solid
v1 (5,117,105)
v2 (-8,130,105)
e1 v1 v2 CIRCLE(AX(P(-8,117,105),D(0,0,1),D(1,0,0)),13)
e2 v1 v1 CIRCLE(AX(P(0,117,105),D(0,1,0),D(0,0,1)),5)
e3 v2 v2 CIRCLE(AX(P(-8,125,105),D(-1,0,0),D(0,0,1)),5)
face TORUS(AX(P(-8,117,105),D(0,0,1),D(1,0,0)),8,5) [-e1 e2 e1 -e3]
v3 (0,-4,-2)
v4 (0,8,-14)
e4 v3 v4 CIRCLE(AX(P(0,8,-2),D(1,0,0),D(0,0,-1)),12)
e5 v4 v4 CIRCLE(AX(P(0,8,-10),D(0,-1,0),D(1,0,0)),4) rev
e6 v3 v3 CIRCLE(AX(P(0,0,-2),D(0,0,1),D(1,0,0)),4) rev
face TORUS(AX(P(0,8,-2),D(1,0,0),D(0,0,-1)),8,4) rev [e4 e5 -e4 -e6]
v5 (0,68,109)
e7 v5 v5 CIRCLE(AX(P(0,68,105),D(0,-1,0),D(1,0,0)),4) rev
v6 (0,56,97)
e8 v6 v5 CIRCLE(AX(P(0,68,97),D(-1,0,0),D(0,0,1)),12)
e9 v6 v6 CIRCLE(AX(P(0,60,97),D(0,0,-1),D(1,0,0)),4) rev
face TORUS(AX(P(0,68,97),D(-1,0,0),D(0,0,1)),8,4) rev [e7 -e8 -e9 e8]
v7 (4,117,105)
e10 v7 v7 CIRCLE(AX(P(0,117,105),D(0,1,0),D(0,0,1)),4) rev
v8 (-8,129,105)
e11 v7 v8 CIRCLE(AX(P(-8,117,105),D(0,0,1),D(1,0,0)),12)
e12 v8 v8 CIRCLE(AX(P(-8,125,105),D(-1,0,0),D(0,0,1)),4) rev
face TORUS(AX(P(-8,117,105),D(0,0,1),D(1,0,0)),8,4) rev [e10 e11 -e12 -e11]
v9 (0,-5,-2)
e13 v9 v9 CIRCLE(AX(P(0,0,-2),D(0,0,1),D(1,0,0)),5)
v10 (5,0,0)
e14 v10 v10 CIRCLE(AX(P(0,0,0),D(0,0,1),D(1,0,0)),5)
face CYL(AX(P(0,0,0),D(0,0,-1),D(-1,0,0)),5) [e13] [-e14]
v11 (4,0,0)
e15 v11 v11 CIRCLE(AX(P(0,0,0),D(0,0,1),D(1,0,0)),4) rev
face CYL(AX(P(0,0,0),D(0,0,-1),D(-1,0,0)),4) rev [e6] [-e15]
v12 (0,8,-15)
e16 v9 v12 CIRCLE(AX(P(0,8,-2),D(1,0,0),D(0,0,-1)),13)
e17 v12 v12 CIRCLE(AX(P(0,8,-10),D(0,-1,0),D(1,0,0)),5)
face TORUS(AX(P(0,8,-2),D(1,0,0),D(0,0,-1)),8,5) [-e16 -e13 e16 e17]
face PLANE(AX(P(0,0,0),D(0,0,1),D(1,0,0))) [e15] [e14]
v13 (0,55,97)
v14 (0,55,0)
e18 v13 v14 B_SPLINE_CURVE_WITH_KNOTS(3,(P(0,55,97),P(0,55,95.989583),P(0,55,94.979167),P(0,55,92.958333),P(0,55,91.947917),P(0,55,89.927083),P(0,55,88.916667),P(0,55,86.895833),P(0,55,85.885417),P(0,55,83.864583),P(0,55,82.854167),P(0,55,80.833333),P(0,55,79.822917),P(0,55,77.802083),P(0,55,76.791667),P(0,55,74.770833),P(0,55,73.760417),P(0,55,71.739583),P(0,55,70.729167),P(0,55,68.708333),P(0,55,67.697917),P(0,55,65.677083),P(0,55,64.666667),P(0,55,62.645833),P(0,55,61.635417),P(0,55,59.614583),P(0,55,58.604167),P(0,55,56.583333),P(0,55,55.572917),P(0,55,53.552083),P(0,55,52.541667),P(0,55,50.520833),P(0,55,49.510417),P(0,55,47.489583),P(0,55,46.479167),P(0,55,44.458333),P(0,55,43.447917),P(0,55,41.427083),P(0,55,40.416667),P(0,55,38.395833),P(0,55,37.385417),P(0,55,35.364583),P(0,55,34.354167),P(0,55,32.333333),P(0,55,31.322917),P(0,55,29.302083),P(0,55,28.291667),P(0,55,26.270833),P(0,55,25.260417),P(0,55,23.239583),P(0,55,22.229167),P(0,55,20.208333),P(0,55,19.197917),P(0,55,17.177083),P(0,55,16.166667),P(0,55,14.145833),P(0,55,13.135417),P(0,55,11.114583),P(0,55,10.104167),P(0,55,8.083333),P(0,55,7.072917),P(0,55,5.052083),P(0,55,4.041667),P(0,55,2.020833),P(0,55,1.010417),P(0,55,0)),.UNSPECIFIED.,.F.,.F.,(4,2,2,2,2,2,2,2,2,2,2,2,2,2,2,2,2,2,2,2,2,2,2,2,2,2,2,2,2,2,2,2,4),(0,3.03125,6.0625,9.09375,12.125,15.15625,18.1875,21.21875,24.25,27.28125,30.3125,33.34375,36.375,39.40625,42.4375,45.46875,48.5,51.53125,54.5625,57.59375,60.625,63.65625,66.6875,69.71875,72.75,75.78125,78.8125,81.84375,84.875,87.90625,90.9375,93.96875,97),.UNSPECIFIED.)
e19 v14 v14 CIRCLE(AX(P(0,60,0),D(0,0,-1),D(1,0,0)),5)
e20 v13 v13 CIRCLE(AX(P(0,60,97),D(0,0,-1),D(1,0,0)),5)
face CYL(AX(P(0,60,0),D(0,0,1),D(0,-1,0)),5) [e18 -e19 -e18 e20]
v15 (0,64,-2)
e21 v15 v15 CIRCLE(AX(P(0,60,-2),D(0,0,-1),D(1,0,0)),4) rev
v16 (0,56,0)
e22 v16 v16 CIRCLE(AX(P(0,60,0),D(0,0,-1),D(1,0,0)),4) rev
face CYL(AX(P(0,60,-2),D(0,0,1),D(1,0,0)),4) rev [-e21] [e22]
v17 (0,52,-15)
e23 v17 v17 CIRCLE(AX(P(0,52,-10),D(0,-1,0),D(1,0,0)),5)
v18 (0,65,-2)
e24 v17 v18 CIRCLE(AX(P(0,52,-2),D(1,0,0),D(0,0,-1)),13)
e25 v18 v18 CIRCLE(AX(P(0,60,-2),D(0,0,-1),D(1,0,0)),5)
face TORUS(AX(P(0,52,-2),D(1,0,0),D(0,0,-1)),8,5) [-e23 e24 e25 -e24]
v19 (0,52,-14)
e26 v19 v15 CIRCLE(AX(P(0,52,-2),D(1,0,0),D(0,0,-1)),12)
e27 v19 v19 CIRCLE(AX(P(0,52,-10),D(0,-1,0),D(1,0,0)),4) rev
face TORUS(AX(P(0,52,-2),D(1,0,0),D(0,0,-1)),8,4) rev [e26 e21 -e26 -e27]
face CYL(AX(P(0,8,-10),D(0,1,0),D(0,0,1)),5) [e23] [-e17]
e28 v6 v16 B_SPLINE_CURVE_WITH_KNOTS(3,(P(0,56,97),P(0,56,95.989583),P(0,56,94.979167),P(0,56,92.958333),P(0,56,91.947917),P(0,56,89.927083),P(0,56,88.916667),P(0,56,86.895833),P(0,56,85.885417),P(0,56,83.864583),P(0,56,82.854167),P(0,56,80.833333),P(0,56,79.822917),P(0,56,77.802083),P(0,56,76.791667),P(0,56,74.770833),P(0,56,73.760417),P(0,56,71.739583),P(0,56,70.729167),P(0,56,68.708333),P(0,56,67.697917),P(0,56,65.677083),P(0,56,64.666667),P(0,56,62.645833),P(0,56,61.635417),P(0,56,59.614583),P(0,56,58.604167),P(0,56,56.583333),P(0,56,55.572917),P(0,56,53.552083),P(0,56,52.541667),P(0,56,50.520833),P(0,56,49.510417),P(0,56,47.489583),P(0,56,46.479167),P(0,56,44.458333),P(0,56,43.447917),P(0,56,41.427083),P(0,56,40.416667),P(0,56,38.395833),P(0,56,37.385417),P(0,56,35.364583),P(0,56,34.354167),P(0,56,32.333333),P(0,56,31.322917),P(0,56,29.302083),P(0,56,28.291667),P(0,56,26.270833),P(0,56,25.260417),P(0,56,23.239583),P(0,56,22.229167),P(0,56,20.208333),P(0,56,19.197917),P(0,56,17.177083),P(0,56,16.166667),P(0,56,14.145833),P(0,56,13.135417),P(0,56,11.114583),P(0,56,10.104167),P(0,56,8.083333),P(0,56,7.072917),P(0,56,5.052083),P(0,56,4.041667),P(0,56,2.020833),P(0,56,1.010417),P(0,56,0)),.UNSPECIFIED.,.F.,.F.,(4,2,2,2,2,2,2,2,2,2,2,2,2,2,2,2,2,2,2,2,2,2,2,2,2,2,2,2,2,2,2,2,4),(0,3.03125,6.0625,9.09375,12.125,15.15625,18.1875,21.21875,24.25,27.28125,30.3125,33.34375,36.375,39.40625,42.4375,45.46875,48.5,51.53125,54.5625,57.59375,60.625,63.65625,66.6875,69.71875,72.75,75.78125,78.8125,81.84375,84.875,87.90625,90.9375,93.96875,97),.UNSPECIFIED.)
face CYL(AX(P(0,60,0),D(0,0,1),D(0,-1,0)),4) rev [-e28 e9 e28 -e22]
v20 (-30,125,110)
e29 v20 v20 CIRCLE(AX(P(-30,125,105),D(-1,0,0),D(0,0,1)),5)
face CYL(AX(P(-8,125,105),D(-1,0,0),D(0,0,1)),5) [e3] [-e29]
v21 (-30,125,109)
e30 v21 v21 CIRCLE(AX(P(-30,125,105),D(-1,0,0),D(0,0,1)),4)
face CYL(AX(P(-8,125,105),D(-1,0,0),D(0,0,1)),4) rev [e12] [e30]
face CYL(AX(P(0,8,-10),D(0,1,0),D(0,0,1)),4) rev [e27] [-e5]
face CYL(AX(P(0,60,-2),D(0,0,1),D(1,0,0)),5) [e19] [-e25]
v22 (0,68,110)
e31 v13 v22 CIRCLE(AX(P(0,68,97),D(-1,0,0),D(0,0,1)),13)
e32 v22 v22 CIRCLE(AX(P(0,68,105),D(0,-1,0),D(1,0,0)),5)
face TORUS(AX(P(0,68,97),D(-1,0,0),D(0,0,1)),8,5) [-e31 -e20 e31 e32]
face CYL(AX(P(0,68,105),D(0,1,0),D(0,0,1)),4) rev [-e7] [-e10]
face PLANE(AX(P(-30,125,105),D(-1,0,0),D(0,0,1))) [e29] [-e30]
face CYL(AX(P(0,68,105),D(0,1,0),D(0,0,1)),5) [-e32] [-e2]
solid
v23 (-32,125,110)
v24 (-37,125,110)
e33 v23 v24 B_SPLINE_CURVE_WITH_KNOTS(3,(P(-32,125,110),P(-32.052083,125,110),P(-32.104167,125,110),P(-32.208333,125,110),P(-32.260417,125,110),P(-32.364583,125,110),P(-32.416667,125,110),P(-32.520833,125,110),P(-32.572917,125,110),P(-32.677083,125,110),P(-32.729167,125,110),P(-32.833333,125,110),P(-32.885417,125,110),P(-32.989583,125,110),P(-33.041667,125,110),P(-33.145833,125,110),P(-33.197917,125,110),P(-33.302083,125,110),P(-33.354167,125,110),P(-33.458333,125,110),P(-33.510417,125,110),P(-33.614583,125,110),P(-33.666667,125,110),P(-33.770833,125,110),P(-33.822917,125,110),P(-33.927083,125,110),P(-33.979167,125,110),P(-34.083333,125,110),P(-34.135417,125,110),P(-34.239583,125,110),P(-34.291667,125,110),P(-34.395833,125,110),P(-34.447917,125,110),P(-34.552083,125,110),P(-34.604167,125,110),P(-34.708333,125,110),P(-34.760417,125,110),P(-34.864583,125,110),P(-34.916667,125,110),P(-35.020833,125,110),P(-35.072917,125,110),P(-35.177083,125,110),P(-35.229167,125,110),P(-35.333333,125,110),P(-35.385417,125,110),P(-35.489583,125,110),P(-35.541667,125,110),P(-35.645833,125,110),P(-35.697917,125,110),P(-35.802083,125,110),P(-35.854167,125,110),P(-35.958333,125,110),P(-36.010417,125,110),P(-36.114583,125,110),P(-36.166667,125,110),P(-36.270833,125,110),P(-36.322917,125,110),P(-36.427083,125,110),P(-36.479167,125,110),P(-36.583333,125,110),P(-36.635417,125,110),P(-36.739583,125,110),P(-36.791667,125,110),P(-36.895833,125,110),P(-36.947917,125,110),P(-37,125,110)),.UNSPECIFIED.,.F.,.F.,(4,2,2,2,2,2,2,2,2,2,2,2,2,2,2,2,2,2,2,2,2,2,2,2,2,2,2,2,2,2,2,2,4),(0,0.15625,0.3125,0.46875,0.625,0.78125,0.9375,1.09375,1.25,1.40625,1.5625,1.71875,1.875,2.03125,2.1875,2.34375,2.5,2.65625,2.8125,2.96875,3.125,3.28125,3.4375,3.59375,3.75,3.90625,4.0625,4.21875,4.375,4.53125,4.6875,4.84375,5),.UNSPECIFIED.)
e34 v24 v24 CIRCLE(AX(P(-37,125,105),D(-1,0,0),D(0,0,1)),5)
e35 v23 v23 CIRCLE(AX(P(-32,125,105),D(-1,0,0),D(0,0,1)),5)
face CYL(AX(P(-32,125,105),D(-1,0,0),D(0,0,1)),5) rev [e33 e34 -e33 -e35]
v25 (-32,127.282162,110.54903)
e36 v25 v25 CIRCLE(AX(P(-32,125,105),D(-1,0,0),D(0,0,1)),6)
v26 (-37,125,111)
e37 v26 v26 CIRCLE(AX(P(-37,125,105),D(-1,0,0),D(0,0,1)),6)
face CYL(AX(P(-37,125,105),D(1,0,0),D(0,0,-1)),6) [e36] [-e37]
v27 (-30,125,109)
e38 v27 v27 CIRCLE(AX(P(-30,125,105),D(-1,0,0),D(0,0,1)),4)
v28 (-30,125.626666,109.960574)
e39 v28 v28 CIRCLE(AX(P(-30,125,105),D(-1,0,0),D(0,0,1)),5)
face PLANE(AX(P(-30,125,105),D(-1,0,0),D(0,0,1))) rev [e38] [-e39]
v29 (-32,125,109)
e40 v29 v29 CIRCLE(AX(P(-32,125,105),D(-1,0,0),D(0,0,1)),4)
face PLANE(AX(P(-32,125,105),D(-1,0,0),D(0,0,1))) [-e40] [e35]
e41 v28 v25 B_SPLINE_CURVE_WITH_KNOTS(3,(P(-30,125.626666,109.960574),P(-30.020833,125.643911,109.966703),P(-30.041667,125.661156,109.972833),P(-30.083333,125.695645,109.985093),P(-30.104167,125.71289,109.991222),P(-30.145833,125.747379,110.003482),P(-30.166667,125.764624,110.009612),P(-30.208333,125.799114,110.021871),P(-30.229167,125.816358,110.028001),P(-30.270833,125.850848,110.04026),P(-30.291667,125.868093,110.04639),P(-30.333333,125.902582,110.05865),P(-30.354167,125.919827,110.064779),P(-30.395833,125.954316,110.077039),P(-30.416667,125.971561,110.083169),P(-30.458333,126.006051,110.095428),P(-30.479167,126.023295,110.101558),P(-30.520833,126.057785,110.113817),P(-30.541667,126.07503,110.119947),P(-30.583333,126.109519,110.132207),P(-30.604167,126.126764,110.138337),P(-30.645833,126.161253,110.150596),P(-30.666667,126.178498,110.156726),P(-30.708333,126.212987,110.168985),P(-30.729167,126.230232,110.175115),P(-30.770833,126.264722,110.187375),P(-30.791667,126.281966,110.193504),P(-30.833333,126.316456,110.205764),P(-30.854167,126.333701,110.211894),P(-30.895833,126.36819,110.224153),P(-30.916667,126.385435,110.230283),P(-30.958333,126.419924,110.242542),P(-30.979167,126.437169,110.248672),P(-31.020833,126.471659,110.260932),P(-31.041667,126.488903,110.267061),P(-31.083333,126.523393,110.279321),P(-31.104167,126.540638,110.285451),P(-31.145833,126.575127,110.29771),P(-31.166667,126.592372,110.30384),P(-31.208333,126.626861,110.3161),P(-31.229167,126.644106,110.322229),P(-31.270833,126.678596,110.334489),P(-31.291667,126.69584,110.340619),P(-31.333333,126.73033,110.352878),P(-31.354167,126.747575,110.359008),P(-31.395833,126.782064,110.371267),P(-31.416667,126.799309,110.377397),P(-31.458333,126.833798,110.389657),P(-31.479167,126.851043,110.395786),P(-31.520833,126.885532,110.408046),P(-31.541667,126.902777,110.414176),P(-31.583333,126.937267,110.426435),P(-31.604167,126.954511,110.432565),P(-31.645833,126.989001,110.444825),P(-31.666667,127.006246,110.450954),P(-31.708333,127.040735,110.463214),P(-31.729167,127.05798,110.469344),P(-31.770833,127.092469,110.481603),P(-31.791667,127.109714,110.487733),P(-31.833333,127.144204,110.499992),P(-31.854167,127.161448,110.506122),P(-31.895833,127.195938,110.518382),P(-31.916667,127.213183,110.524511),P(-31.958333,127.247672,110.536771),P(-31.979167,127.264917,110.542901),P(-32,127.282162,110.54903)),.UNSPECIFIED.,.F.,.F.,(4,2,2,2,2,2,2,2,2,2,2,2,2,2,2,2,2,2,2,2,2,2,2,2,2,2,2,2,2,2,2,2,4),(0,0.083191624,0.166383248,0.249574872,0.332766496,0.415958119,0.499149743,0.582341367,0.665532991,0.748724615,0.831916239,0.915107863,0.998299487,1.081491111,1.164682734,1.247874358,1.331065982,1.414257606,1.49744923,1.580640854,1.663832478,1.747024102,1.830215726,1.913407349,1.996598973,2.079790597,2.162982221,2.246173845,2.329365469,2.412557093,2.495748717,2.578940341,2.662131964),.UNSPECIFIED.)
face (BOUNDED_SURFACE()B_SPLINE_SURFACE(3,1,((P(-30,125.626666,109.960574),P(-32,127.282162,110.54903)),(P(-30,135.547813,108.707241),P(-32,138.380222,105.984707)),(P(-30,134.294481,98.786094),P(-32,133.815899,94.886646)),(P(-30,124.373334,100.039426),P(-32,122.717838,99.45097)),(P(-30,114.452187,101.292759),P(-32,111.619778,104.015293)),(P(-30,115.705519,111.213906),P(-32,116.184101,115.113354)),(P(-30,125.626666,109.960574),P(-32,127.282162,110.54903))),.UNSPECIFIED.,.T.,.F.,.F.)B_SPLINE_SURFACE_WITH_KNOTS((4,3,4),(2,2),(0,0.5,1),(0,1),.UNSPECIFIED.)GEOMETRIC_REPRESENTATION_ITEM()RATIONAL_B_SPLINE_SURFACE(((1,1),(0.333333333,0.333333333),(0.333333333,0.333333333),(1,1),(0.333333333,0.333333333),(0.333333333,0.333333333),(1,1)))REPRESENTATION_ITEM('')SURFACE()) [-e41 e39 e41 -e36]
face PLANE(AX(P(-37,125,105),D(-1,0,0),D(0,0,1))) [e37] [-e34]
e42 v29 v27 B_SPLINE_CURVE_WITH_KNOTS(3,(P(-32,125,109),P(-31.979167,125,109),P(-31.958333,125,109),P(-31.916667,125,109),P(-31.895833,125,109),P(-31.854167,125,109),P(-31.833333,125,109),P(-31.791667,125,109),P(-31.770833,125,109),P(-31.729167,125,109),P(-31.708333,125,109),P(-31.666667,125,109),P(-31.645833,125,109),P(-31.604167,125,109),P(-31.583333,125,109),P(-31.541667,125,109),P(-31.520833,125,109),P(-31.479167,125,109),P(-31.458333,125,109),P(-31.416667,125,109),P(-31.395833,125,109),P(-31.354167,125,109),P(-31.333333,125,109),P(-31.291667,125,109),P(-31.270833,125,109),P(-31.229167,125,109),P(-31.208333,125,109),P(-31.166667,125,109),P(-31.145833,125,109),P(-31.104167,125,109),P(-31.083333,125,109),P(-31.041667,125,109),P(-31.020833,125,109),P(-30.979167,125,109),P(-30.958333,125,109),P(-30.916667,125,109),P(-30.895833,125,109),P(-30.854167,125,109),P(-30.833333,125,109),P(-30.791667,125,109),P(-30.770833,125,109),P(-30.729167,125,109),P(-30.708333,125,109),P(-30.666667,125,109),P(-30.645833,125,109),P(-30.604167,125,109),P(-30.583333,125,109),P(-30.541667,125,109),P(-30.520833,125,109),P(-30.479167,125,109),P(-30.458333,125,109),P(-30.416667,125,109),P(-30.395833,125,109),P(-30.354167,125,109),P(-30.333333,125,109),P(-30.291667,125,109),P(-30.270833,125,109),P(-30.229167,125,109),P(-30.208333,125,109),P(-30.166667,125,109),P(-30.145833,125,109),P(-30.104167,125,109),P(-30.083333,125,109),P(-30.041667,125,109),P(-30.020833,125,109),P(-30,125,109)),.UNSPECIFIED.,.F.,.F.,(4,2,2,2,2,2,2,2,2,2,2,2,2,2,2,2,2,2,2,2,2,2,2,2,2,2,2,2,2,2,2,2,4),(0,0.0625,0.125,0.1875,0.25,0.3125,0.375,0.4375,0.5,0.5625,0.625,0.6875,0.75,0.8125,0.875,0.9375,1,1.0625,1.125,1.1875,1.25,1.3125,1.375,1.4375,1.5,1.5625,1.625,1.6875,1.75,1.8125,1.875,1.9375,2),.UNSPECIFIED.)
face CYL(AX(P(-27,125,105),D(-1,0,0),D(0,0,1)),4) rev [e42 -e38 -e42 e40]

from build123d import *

# Parameters (mm, degrees)
SKETCH1_R           = 5
SKETCH1_R_2         = 4
SKETCH5_R           = 5
SKETCH5_R_2         = 4
BOSS_EXTRUDE2_START = 20
SKETCH6_R           = 5
SKETCH6_R_2         = 4
BOSS_EXTRUDE2_DEPTH = 20
SKETCH9_R           = 6
BOSS_EXTRUDE3_DEPTH = 5
SKETCH10_R          = 5
CUT_EXTRUDE1_DEPTH  = 5
SKETCH11_R          = 4
CUT_EXTRUDE2_DEPTH  = 5


with BuildPart() as part:
    # Sweep1: sweep along a path in Sketch2
    with BuildLine(Plane(origin=(0, 0, 0), x_dir=(0, 0, -1), z_dir=(1, 0, 0))) as sweep1_path:
        Line((0, 0), (2, 0))
        ThreePointArc((2, 0), (7.656854249, 2.343145751), (10, 8))
        Line((10, 8), (10, 52))
        ThreePointArc((10, 52), (7.656854249, 57.656854249), (2, 60))
        Line((2, 60), (0, 60))
        Line((0, 60), (-97, 60))
        ThreePointArc((-97, 60), (-102.656854249, 62.343145751), (-105, 68))
        Line((-105, 68), (-105, 115))
    # Sketch1 → Sweep1 (sweep)
    with BuildSketch(Plane.XY):
        Circle(SKETCH1_R)
        Circle(SKETCH1_R_2, mode=Mode.SUBTRACT)
    sweep(path=sweep1_path.line)

    # Sweep2: sweep along a path in Sketch4
    with BuildLine(Plane(origin=(0, 0, 105), x_dir=(-1, 0, 0), z_dir=(0, 0, -1))) as sweep2_path:
        Line((0, 115), (0, 117))
        ThreePointArc((0, 117), (2.343145751, 122.656854249), (8, 125))
        Line((8, 125), (10, 125))
    # Sketch5 → Sweep2 (sweep)
    with BuildSketch(Plane(origin=(0, 115, 0), x_dir=(1, 0, 0), z_dir=(0, 1, 0))):
        with Locations((0, -105)):
            Circle(SKETCH5_R)
        with Locations((0, -105)):
            Circle(SKETCH5_R_2, mode=Mode.SUBTRACT)
    sweep(path=sweep2_path.line)

    # Sketch6 → Boss-Extrude2 (add)
    with BuildSketch(Plane.ZY.offset(10).offset(BOSS_EXTRUDE2_START)):
        with Locations((105, 125)):
            Circle(SKETCH6_R)
        with Locations((105, 125)):
            Circle(SKETCH6_R_2, mode=Mode.SUBTRACT)
    extrude(amount=-BOSS_EXTRUDE2_DEPTH)


with BuildPart() as body_2:
    # Loft1: read off the stored shape, not the designer's step
    # Loft1: loft between two sections, ruled curve by curve
    loft1_from = [
        Edge.make_bspline([(-30, 125.626666168, 109.960573507), (-30, 135.547813181, 108.707241171), (-30, 134.294480845, 98.786094158), (-30, 124.373333832, 100.039426493), (-30, 114.452186819, 101.292758829), (-30, 115.705519155, 111.213905842), (-30, 125.626666168, 109.960573507)], [0, 0, 0, 0, 0.5, 0.5, 0.5, 1, 1, 1, 1], 3, [1, 0.333333333, 0.333333333, 1, 0.333333333, 0.333333333, 1]),
    ]
    loft1_to = [
        Edge.make_bspline([(-32, 127.282161582, 110.549030412), (-32, 138.380222406, 105.984707248), (-32, 133.815899242, 94.886646424), (-32, 122.717838418, 99.450969588), (-32, 111.619777594, 104.015292752), (-32, 116.184100758, 115.113353576), (-32, 127.282161582, 110.549030412)], [0, 0, 0, 0, 0.5, 0.5, 0.5, 1, 1, 1, 1], 3, [1, 0.333333333, 0.333333333, 1, 0.333333333, 0.333333333, 1]),
    ]
    loft1 = Solid(Shell([*[Face.make_surface_from_curves(loft1_from[k], loft1_to[k]) for k in range(1)], Face(Wire(loft1_from)), Face(Wire(loft1_to))]))
    add(loft1)

    # Sketch9 → Boss-Extrude3 (add)
    with BuildSketch(Plane.ZY.offset(32)):
        with Locations(Location((105, 125, 0), (0, 0, 22.356))):
            Circle(SKETCH9_R)
    extrude(amount=BOSS_EXTRUDE3_DEPTH)

    # Sketch10 → Cut-Extrude1 (cut)
    with BuildSketch(Plane.ZY.offset(37)):
        with Locations((105, 125)):
            Circle(SKETCH10_R)
    extrude(amount=-CUT_EXTRUDE1_DEPTH, mode=Mode.SUBTRACT)

    # Sketch11 → Cut-Extrude2 (cut)
    with BuildSketch(Plane.ZY.offset(32)):
        with Locations((105, 125)):
            Circle(SKETCH11_R)
    extrude(amount=-CUT_EXTRUDE2_DEPTH, mode=Mode.SUBTRACT)


solid = Compound([part.part, body_2.part])
